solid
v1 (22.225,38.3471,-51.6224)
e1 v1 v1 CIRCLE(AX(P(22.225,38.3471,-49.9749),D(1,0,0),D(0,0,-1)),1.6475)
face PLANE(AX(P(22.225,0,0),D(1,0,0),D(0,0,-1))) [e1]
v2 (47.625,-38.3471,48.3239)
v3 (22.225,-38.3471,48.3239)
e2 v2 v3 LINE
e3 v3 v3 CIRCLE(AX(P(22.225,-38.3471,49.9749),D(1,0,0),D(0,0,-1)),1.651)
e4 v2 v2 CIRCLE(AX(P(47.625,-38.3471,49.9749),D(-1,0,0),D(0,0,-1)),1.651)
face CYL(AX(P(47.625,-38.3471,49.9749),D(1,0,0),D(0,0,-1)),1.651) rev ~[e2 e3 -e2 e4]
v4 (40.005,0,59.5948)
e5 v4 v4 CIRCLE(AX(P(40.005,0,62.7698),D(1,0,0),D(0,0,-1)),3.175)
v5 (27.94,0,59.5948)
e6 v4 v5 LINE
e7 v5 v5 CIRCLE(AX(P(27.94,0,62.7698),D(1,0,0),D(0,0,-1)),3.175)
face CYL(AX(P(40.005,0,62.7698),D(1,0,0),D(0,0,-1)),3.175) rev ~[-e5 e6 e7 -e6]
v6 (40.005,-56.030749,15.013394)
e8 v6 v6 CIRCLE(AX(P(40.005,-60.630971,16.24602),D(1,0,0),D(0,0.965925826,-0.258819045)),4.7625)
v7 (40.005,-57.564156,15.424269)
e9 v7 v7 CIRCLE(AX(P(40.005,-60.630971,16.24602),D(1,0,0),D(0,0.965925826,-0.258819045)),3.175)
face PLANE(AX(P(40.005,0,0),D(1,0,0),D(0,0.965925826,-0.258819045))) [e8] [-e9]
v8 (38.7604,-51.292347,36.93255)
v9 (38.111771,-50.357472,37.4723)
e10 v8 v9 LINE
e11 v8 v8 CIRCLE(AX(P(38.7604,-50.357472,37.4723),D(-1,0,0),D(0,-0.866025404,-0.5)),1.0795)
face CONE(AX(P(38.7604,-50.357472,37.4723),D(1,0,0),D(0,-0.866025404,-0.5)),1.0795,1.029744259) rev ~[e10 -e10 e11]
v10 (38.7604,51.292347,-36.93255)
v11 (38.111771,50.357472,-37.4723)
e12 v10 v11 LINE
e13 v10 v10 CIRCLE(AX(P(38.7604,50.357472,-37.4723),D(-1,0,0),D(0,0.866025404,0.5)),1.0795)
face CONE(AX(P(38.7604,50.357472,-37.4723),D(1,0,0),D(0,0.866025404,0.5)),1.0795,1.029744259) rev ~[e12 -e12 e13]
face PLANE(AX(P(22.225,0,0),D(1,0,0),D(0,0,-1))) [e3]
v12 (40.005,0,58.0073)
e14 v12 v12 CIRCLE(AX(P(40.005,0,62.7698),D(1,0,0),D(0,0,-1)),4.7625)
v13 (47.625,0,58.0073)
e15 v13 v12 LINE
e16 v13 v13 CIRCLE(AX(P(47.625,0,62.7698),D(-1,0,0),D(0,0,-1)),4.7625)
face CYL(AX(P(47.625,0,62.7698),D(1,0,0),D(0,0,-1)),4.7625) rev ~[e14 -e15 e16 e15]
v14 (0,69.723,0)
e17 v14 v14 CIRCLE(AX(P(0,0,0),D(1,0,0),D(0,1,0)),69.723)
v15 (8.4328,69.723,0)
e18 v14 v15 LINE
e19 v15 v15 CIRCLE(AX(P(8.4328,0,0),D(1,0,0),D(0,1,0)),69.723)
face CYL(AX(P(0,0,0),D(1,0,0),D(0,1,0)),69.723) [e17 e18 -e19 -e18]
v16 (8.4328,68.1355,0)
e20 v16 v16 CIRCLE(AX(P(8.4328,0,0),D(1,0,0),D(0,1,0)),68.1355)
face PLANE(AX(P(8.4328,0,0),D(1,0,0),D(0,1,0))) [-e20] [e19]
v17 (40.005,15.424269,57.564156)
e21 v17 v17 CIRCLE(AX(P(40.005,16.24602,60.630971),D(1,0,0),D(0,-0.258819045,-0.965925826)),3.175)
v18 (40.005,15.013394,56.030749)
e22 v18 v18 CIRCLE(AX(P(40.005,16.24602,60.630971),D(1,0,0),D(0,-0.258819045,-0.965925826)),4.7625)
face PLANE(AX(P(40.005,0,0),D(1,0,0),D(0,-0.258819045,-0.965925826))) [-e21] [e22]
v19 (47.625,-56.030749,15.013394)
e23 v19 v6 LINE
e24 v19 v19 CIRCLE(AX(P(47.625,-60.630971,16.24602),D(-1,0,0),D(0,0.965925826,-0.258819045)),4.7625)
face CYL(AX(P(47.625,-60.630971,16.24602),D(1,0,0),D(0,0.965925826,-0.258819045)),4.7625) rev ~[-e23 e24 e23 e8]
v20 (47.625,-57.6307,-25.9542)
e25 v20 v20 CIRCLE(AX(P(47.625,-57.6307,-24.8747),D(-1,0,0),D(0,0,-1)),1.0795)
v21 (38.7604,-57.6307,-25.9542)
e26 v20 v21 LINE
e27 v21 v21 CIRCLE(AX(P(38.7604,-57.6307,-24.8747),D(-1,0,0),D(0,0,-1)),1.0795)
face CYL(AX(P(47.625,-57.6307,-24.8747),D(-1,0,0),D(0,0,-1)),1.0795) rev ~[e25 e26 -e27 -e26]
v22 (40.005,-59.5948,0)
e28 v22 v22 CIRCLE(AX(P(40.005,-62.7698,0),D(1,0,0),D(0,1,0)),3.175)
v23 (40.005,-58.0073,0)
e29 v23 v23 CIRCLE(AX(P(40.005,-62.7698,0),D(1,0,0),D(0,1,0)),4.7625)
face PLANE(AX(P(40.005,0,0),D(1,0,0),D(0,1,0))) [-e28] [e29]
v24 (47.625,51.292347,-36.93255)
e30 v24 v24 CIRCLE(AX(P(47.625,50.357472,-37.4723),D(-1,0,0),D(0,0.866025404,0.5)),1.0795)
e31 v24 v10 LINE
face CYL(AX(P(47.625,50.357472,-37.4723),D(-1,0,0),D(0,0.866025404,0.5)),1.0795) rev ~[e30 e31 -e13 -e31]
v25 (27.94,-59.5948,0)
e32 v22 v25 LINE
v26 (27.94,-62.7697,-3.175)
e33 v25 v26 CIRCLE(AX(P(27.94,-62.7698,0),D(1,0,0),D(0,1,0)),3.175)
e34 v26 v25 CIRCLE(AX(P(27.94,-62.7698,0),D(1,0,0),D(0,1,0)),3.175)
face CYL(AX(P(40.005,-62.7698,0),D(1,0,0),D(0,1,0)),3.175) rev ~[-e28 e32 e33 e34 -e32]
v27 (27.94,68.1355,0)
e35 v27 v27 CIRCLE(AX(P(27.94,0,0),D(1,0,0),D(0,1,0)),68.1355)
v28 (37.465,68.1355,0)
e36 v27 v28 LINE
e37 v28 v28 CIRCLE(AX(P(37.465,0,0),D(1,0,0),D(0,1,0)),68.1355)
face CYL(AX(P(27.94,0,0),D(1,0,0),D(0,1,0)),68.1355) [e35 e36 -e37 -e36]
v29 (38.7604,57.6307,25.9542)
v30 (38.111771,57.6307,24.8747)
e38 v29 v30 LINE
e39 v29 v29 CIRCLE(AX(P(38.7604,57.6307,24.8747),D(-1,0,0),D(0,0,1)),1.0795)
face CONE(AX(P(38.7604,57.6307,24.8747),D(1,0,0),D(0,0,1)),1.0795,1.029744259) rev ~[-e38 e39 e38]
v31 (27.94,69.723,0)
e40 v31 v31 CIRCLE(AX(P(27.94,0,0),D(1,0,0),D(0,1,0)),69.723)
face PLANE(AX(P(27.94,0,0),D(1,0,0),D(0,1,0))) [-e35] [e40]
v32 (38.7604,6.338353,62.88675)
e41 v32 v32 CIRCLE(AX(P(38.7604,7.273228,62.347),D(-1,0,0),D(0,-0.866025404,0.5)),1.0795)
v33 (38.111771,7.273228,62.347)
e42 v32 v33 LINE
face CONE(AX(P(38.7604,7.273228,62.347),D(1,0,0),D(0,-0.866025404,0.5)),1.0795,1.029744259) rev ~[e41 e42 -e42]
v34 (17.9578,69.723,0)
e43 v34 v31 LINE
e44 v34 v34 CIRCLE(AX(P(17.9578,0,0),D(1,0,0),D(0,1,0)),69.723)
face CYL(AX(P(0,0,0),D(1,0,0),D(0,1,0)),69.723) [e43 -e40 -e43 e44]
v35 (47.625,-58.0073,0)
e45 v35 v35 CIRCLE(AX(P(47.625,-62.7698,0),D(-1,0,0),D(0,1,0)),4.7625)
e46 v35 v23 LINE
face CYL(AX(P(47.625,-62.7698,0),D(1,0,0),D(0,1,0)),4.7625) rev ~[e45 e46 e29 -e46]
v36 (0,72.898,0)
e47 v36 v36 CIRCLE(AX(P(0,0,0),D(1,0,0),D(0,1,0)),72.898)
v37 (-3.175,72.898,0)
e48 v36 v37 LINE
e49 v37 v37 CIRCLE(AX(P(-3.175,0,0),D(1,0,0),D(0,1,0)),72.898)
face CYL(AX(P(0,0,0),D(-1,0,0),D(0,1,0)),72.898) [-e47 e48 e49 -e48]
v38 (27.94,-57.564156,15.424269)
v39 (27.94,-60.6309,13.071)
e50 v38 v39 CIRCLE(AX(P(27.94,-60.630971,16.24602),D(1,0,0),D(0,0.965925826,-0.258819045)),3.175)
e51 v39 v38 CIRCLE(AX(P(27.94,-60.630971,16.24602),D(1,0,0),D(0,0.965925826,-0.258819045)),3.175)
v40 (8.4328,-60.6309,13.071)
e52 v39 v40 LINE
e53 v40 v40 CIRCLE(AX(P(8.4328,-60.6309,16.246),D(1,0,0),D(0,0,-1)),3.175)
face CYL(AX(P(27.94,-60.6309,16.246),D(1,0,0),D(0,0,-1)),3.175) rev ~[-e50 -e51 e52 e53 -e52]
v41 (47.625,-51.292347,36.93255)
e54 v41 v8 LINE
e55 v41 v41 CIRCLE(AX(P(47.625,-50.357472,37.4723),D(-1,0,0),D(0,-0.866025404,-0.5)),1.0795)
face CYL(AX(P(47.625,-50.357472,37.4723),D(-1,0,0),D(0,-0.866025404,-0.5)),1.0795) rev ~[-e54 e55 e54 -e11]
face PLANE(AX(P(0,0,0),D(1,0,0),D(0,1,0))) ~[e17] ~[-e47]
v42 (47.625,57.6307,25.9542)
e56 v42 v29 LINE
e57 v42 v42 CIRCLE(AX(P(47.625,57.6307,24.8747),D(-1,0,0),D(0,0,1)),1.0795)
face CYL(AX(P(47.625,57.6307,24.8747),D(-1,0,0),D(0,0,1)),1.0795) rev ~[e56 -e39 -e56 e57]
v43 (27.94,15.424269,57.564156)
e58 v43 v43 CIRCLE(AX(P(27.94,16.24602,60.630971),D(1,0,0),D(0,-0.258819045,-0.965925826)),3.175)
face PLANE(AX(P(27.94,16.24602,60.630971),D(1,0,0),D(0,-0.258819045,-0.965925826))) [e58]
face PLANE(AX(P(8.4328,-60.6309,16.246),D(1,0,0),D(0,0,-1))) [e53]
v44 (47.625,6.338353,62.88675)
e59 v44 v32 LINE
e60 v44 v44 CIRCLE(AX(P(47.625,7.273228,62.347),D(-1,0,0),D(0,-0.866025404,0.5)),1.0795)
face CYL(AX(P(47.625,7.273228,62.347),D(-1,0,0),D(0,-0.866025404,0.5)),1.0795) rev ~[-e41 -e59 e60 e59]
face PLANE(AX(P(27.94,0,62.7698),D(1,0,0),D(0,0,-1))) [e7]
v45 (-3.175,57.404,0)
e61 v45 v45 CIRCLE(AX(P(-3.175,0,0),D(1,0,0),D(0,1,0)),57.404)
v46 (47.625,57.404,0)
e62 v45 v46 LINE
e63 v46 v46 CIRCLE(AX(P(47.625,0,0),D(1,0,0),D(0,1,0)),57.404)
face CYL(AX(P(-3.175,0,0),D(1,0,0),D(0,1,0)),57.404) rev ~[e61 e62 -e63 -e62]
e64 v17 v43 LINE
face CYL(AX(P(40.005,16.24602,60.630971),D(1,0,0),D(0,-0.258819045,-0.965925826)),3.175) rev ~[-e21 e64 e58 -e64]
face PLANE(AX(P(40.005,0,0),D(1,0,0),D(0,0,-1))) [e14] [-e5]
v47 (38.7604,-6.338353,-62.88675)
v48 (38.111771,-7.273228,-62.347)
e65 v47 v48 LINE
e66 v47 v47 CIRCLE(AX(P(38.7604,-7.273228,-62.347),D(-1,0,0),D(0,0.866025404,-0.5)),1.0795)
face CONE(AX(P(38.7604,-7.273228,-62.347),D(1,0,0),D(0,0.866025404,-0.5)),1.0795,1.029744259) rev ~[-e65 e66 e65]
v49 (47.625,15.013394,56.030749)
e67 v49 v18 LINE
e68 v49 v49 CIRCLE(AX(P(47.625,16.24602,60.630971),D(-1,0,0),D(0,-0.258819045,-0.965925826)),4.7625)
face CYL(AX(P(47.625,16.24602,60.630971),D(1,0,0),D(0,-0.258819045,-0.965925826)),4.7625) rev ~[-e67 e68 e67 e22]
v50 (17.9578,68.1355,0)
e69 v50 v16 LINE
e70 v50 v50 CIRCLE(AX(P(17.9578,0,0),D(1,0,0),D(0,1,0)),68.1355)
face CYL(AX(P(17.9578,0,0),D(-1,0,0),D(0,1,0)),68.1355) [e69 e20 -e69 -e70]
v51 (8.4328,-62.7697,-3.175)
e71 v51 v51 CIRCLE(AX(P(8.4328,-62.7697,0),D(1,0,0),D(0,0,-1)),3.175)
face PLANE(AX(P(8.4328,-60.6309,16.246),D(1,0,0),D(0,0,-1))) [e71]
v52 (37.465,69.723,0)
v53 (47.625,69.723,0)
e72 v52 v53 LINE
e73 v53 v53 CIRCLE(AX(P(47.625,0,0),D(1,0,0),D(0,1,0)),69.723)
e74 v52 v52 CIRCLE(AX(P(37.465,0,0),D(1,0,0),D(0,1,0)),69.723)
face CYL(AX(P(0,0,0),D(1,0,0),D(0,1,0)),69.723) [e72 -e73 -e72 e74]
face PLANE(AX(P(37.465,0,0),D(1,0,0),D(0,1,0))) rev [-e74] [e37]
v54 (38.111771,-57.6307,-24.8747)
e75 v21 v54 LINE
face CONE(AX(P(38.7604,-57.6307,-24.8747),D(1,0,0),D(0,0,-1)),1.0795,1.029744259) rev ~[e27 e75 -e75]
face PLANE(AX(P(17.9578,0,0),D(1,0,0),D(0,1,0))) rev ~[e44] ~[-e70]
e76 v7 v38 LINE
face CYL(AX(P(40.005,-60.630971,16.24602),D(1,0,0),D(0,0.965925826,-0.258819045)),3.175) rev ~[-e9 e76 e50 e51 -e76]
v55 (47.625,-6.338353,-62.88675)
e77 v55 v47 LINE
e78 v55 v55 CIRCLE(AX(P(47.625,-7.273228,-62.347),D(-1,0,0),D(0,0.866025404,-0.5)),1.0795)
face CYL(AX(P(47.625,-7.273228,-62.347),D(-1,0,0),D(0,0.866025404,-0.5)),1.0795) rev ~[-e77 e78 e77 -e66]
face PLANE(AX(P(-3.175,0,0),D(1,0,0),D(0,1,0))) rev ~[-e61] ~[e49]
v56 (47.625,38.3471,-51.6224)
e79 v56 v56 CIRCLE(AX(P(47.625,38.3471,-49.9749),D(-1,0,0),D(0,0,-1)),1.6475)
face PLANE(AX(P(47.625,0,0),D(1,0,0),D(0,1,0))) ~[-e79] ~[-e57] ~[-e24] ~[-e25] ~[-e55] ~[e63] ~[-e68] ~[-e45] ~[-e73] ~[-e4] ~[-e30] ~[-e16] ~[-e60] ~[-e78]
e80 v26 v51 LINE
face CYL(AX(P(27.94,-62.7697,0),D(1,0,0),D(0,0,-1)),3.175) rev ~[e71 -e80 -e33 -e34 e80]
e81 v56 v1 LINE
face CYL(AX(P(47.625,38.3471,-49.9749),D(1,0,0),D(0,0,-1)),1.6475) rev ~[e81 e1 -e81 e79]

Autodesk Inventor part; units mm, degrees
ref_plane "YZ Plane" through (0, 0, 0) normal (1, 0, 0) x (0, 1, 0)
ref_plane "XZ Plane" through (0, 0, 0) normal (0, 1, 0) x (-1, 0, 0)
ref_plane "XY Plane" through (0, 0, 0) normal (0, 0, 1) x (1, 0, 0)
sketch "Sketch1" plane through (0, 0, 0) normal (0, 0, 1) x (1, 0, 0)
  line L0 (-22.2356, 0) -> (22.2356, 0) construction
  line L1 (0, 69.723) -> (47.625, 69.723)
  line L2 (0, 69.723) -> (0, 72.898)
  line L3 (0, 72.898) -> (-3.175, 72.898)
  line L4 (-3.175, 72.898) -> (-3.175, 57.404)
  line L5 (-3.175, 57.404) -> (47.625, 57.404)
  line L6 (47.625, 57.404) -> (47.625, 69.723)
  line L7 (8.4328, 69.723) -> (17.9578, 69.723)
  line L8 (17.9578, 69.723) -> (17.9578, 68.1355)
  line L9 (17.9578, 68.1355) -> (8.4328, 68.1355)
  line L10 (37.465, 69.723) -> (27.94, 69.723)
  line L11 (27.94, 69.723) -> (27.94, 68.1355)
  line L12 (27.94, 68.1355) -> (37.465, 68.1355)
  line L13 (37.465, 68.1355) -> (37.465, 69.723)
  line L14 (8.4328, 69.723) -> (8.4328, 68.1355)
  point P0 (0, 0)
  point P1 (0, 0)
  dimension "d1" = 139.446
  dimension "d2" = 69.723
  dimension "d3" = 3.175
  dimension "d4" = 3.175
  dimension "d5" = 114.808
  dimension "d6" = 1.5875
  dimension "d7" = 9.525
  dimension "d12" = 50.8
  dimension "d15" = 9.525
  dimension "d16" = 19.685
  dimension "d17" = 11.6078
  dimension "d18" = 1.5875
revolve "Revolution1" add sketch "Sketch1" angle 360 about axis through (-22.2356, 0, 0) along (1, 0, 0) contours L1 L14 L9 L8 L11 L12 L13 L6 L5 L4 L3 L2
sketch "Sketch2" plane through (47.625, 0, 0) normal (1, 0, 0) x (0, 0, -1)
  circle A0 centre (0, 0) radius 57.404 projected
  circle A1 centre (0, 0) radius 68.1355 projected
  circle A2 centre (0, 0) radius 68.1355 projected
  line L0 (-68.1355, 0) -> (-57.404, 0)
  circle A3 centre (-62.7698, 0) radius 4.7625
  point P0 (-58.0072, 0)
  dimension "d19" = 9.525
extrude "Extrusion1" cut sketch "Sketch2" against normal blind 7.62 contours A3 L0 | L0 A3
sketch "Sketch3" plane through (40.005, 0, 62.7698) normal (1, 0, 0) x (0, 0, -1)
  circle A0 centre (0, 0) radius 4.7625 projected
  circle A1 centre (0, 0) radius 3.175
  point P0 (62.7698, 0)
  dimension "d22" = 6.35
extrude "Extrusion2" cut sketch "Sketch3" against normal up to surface (12.065 mm away) contours A1
pattern_circular "Circular Pattern1" count 2 over 15 about axis through (22.225, 0, 0) along (-1, 0, 0) of "Extrusion2", "Extrusion1"
pattern_circular "Circular Pattern2" count 2 over 90 about axis through (22.225, 0, 0) along (1, 0, 0) of "Extrusion2", "Extrusion1", "Circular Pattern1"
sketch "Sketch4" plane through (27.94, -60.6309, 16.246) normal (1, 0, 0) x (0, 0, -1)
  circle A0 centre (0, 0) radius 3.175 projected
  circle A1 centre (16.246, -2.1388) radius 3.175 projected
  point P0 (16.246, 60.6309)
extrude "Extrusion3" cut sketch "Sketch4" against normal up to surface (19.5072 mm away)
sketch "Sketch5" plane through (47.625, 0, 0) normal (1, 0, 0) x (0, 0, -1)
  circle A0 centre (-16.246, -60.6309) radius 4.7625 construction
  circle A1 centre (0, -62.7698) radius 4.7625 construction
  circle A2 centre (-60.6309, 16.246) radius 4.7625 construction
  circle A3 centre (-62.7698, 0) radius 4.7625 construction
  circle A4 centre (0, 0) radius 69.723 construction
  circle A5 centre (0, 0) radius 57.404 construction
  circle A6 centre (0, 0) radius 69.723 construction
  circle A7 centre (-16.246, -60.6309) radius 3.175 construction
  line L0 (-16.246, -60.6309) -> (0, 0) construction
  line L1 (0, 0) -> (-62.7698, 0) construction
  circle A8 centre (-49.9749, -38.3471) radius 1.651
  circle A9 centre (49.9749, 38.3471) radius 1.6475
  line L2 (-55.315, -42.4447) -> (-45.5417, -34.9453)
  line L3 (45.5417, 34.9453) -> (55.315, 42.4447)
  point P0 (0, 0)
  point P1 (0, 0)
  dimension "d33" = 75
  dimension "d35" = 3.302
  dimension "d36" = 5.588
  dimension "d38" = 5.588
extrude "Extrusion4" cut sketch "Sketch5" against normal blind 25.4
sketch "Sketch6" plane through (47.625, 0, 0) normal (1, 0, 0) x (0, 0, -1)
  circle A0 centre (49.9749, 38.3471) radius 1.6475 construction
  circle A1 centre (-49.9749, -38.3471) radius 1.651 construction
  circle A2 centre (-16.246, -60.6309) radius 4.7625 construction
  circle A3 centre (0, -62.7698) radius 4.7625 construction
  circle A4 centre (-60.6309, 16.246) radius 4.7625 construction
  circle A5 centre (-62.7698, 0) radius 4.7625 construction
  circle A6 centre (0, 0) radius 69.723 construction
  circle A7 centre (0, 0) radius 57.404 construction
  circle A8 centre (0, 0) radius 62.7698 construction
  line L0 (0, 0) -> (0, -62.7698) construction
  circle A9 centre (0, -62.7698) radius 3.175 projected
  circle A10 centre (0, -62.7698) radius 25.4 construction
  point P0 (0, 0)
  point P1 (24.8747, -57.6307)
  dimension "d41" = 50.8
hole "Hole1" at (47.625, -57.6307, -24.8747) direction (-1, 0, 0) diameter 2.159 depth 8.8646 tip angle 118
pattern_circular "Circular Pattern3" count 6 over 360 about axis through (22.225, 0, 0) along (1, 0, 0) of "Hole1"
equation "\"d18\" = d6"
equation "\"d38\" = d36"
equation "\"d34\" = 0.5 * d33"
properties part number "1131_Inner RU Body_V1" material "Bronze"
